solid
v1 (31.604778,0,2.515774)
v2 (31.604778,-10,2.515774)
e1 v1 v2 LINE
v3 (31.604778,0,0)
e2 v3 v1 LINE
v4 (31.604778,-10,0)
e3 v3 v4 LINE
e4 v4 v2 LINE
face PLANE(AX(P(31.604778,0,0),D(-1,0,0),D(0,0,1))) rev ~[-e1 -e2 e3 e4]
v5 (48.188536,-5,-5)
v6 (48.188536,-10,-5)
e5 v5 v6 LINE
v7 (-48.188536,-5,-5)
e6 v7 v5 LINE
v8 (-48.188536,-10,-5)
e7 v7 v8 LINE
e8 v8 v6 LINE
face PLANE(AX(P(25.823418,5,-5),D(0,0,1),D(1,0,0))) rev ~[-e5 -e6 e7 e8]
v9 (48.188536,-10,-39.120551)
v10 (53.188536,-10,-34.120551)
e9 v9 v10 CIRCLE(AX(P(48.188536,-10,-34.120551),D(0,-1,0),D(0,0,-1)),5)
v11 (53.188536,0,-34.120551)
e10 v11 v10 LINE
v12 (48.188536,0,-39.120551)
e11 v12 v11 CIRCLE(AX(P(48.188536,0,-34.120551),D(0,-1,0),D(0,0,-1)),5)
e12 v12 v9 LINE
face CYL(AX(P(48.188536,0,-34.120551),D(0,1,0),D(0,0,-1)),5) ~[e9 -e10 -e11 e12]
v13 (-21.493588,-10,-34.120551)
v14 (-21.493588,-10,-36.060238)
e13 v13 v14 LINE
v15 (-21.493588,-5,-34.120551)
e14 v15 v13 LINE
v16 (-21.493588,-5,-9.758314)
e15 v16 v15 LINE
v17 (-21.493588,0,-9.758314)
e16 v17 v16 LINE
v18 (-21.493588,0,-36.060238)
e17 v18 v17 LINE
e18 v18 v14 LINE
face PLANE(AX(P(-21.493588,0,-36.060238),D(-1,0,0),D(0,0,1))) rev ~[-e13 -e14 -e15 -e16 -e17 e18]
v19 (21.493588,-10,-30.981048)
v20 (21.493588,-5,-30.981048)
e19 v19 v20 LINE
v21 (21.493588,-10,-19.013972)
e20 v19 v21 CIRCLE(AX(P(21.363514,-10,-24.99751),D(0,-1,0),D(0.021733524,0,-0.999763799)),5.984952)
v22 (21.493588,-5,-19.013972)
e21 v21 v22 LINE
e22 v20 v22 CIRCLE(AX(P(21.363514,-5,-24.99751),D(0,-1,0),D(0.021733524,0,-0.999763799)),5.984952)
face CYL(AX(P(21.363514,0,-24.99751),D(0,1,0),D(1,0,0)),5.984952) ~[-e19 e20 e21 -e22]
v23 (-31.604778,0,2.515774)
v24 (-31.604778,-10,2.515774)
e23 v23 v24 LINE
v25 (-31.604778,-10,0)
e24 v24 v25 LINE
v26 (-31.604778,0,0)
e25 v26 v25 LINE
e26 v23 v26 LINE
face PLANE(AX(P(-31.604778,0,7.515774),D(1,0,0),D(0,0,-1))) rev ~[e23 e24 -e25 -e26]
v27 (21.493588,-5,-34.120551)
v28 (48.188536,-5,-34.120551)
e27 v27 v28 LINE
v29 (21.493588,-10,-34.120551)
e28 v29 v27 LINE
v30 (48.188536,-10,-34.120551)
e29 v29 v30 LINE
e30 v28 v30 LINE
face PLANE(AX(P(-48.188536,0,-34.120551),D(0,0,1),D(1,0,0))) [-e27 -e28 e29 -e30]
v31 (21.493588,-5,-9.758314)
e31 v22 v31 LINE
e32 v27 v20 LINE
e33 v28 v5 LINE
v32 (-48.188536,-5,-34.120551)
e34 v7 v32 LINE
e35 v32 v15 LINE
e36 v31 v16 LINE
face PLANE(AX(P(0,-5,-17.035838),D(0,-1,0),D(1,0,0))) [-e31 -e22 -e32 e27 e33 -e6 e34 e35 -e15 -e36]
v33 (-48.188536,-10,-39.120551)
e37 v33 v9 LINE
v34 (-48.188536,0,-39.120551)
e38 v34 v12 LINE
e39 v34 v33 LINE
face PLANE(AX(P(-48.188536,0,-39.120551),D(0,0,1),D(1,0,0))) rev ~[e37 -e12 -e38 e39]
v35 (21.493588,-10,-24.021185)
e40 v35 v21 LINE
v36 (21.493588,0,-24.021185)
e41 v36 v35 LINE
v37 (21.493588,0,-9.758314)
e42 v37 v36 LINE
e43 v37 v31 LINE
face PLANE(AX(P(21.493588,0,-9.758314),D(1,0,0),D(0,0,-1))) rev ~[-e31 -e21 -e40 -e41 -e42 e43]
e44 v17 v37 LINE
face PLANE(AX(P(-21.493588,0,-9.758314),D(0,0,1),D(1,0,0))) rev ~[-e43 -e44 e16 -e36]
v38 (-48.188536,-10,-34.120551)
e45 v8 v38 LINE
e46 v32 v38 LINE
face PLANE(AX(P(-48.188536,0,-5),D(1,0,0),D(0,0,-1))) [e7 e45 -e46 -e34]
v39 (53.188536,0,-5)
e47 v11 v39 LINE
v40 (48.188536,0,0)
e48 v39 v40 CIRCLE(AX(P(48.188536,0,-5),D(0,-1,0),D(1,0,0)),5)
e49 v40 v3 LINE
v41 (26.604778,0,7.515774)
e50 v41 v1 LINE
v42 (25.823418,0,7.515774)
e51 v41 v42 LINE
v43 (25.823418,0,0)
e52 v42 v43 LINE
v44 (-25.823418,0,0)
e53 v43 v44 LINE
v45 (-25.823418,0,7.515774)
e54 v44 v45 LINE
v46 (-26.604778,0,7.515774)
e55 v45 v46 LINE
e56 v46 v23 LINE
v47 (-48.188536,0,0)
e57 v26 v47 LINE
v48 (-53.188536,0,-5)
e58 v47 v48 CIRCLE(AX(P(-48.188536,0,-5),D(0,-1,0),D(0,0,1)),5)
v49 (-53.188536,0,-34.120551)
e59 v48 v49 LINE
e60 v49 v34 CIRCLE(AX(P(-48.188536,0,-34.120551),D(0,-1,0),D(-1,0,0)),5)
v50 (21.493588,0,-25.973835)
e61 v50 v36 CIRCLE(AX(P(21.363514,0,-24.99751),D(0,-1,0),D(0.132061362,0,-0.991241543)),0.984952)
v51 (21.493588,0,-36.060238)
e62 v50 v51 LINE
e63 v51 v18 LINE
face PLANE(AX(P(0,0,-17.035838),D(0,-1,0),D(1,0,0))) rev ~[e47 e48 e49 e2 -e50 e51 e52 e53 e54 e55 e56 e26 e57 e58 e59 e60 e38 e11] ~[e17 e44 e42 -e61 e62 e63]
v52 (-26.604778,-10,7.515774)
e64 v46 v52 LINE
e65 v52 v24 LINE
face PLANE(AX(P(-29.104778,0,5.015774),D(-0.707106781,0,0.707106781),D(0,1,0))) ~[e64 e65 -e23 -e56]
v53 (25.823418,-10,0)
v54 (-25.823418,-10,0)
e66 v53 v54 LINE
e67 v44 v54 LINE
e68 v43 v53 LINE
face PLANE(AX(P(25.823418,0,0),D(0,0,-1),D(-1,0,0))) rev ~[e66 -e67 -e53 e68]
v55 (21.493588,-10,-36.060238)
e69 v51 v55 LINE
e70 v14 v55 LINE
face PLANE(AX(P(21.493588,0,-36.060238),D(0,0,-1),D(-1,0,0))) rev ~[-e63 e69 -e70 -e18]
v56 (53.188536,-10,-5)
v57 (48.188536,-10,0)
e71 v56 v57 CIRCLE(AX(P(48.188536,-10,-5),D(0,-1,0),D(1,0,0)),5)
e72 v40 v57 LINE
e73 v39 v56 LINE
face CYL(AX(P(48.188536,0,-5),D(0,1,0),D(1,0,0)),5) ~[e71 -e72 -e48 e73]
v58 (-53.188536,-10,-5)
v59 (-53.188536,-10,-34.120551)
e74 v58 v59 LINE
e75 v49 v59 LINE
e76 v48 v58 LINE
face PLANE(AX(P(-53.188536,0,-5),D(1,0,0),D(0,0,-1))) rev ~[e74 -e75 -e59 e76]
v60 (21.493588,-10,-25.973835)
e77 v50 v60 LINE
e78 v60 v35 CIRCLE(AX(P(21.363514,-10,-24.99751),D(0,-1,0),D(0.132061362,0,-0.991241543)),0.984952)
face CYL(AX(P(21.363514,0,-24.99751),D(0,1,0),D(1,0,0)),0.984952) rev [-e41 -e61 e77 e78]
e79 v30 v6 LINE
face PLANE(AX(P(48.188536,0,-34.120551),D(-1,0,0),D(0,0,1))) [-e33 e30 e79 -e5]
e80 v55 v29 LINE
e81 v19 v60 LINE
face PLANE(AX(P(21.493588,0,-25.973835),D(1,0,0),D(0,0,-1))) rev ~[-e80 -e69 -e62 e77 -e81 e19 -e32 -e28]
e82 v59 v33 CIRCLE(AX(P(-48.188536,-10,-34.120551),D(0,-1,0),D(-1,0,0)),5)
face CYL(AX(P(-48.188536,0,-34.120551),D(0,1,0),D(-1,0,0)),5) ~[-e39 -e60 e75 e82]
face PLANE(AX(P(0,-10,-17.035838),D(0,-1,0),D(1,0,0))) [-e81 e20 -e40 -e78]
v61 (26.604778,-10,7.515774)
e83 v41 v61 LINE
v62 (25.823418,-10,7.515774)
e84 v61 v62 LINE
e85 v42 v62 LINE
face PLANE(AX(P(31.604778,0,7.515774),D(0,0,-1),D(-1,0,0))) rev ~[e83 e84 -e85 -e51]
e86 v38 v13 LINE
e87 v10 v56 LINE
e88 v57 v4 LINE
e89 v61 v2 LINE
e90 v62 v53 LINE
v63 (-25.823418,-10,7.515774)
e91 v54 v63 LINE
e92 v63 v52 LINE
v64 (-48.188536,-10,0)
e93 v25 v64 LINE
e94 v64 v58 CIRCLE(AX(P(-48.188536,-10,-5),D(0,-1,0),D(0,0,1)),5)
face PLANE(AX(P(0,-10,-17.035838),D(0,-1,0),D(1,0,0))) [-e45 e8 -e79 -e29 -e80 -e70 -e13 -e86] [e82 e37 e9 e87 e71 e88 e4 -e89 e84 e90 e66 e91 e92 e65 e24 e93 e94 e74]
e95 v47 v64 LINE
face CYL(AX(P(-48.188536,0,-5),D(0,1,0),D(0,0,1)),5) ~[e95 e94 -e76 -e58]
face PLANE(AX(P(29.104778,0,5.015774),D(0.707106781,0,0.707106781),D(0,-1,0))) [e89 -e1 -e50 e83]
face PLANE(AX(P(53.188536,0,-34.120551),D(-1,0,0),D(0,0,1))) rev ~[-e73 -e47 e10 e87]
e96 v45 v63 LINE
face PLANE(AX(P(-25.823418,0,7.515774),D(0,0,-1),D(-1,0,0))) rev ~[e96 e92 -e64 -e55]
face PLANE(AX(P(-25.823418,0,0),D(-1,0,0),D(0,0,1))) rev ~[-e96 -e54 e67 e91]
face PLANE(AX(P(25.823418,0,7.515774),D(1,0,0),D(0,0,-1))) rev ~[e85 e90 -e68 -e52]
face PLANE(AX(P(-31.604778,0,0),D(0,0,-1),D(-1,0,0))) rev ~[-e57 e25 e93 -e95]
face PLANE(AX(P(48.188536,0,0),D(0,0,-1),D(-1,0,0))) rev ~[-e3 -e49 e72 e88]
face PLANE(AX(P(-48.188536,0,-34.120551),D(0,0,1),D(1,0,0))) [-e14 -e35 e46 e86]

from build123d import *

# Parameters (mm, degrees)
F0_R        = 0.9849519721
F1_DEPTH    = 10
F2_T        = 5
F2_T3_DEPTH = 20
F3_SIZE     = 5
F5_DEPTH    = 25


# Not quite as in the source:
# - a shell that OpenCascade refuses in one call is made with other operations: the cavity is built on its own and cut out


with BuildPart() as f1:
    # F0 (on Front) → F1 (new body)
    with BuildSketch(Plane.XZ):
        with BuildLine():
            Line((25.823418051, 0), (0, 0))
            Line((0, 0), (-25.823418051, 0))
            Line((-25.823418051, 0), (-25.823418051, 7.5157736428))
            Line((-25.823418051, 7.5157736428), (-31.6047780216, 7.5157736428))
            Line((-31.6047780216, 7.5157736428), (-31.6047780216, 0))
            Line((-31.6047780216, 0), (-48.1885363162, 0))
            ThreePointArc((-48.1885363162, 0), (-51.7240702221, -1.4644660941), (-53.1885363162, -5))
            Line((-53.1885363162, -5), (-53.1885363162, -34.1205511987))
            ThreePointArc((-53.1885363162, -34.1205511987), (-51.7240702221, -37.6560851047), (-48.1885363162, -39.1205511987))
            Line((-48.1885363162, -39.1205511987), (0, -39.1205511987))
            Line((0, -39.1205511987), (48.1885363162, -39.1205511987))
            ThreePointArc((48.1885363162, -39.1205511987), (51.7240702221, -37.6560851047), (53.1885363162, -34.1205511987))
            Line((53.1885363162, -34.1205511987), (53.1885363162, -5))
            ThreePointArc((53.1885363162, -5), (51.7240702221, -1.4644660941), (48.1885363162, 0))
            Line((48.1885363162, 0), (31.6047780216, 0))
            Line((31.6047780216, 0), (31.6047780216, 7.5157736428))
            Line((31.6047780216, 7.5157736428), (25.823418051, 7.5157736428))
            Line((25.823418051, 7.5157736428), (25.823418051, 0))
        make_face()
        with Locations((21.3635135442, -24.997510016)):
            Circle(F0_R, mode=Mode.SUBTRACT)
    extrude(amount=F1_DEPTH)

    # F2: shell of thickness 5, made by hand


with BuildPart() as f2_core1:
    # F2_t2: copy of F1
    add(f1.part)

    # the walls: a layer under each face that stays
    f2_faces = [f2_core1.faces().sort_by_distance(p)[0] for p in [
        (39.8966571689, -5, 0),
        (20.3785615721, -5, -24.997510016),
        (53.1885363162, -5, -19.5602755994),
        (0, -5, -39.1205511987),
        (-53.1885363162, -5, -19.5602755994),
        (-39.8966571689, -5, 0),
        (-31.6047780216, -5, 3.7578868214),
        (-28.7140980363, -5, 7.5157736428),
        (-25.823418051, -5, 3.7578868214),
        (0, -5, 0),
        (25.823418051, -5, 3.7578868214),
        (28.7140980363, -5, 7.5157736428),
        (0, 0, -15.802388778),
        (31.6047780216, -5, 3.7578868214),
    ]]
    thicken(f2_faces, amount=-F2_T, mode=Mode.SUBTRACT)

    # F2_s4 → F2_t3 (cut)
    with BuildSketch(Plane.XZ.offset(-5)):
        Polygon((31.6547780216, 0.05), (31.6047780216, -5), (26.6047780216, -5), (26.6047780216, 0), align=None)
        Polygon((-31.6547780216, 0.05), (-31.6047780216, -5), (-26.6047780216, -5), (-26.6047780216, 0), align=None)
        Polygon((-25.773418051, 0.05), (-30.823418051, 0), (-30.823418051, -5), (-25.823418051, -5), align=None)
        Polygon((25.773418051, 0.05), (25.823418051, -5), (30.823418051, -5), (30.823418051, 0), align=None)
    extrude(amount=F2_T3_DEPTH, mode=Mode.SUBTRACT)


with BuildPart() as f1_1:
    add(f1.part)

    # what is left inside the walls is the cavity
    f2_cavity = [f2_core1.part.solids().sort_by_distance(p)[0] for p in [
        (0, -9.95, -24.413701),
    ]]
    add(f2_cavity, mode=Mode.SUBTRACT)

    # F3
    f3_edges = [f1_1.edges().sort_by_distance(p)[0] for p in [
        (-31.604778, -5, 7.515774),
        (31.604778, -5, 7.515774),
    ]]
    chamfer(f3_edges, length=F3_SIZE)

    # F4 (on face) → F5 (cut)
    with BuildSketch(Plane(origin=(0, 0, 0), x_dir=(-1, 0, 0), z_dir=(0, 1, 0))):
        with BuildLine():
            Line((21.4935876429, -36.0602382571), (21.4935876429, -9.7583141178))
            Line((21.4935876429, -9.7583141178), (-21.4935876429, -9.7583141178))
            Line((-21.4935876429, -9.7583141178), (-21.4935876429, -24.0211847033))
            ThreePointArc((-21.4935876429, -24.0211847033), (-20.714663158, -24.2564812961), (-20.3785615721, -24.997510016))
            ThreePointArc((-20.3785615721, -24.997510016), (-20.714663158, -25.7385387358), (-21.4935876429, -25.9738353286))
            Line((-21.4935876429, -25.9738353286), (-21.4935876429, -36.0602382571))
            Line((-21.4935876429, -36.0602382571), (21.4935876429, -36.0602382571))
        make_face()
    extrude(amount=-F5_DEPTH, mode=Mode.SUBTRACT)


solid = f1_1.part
